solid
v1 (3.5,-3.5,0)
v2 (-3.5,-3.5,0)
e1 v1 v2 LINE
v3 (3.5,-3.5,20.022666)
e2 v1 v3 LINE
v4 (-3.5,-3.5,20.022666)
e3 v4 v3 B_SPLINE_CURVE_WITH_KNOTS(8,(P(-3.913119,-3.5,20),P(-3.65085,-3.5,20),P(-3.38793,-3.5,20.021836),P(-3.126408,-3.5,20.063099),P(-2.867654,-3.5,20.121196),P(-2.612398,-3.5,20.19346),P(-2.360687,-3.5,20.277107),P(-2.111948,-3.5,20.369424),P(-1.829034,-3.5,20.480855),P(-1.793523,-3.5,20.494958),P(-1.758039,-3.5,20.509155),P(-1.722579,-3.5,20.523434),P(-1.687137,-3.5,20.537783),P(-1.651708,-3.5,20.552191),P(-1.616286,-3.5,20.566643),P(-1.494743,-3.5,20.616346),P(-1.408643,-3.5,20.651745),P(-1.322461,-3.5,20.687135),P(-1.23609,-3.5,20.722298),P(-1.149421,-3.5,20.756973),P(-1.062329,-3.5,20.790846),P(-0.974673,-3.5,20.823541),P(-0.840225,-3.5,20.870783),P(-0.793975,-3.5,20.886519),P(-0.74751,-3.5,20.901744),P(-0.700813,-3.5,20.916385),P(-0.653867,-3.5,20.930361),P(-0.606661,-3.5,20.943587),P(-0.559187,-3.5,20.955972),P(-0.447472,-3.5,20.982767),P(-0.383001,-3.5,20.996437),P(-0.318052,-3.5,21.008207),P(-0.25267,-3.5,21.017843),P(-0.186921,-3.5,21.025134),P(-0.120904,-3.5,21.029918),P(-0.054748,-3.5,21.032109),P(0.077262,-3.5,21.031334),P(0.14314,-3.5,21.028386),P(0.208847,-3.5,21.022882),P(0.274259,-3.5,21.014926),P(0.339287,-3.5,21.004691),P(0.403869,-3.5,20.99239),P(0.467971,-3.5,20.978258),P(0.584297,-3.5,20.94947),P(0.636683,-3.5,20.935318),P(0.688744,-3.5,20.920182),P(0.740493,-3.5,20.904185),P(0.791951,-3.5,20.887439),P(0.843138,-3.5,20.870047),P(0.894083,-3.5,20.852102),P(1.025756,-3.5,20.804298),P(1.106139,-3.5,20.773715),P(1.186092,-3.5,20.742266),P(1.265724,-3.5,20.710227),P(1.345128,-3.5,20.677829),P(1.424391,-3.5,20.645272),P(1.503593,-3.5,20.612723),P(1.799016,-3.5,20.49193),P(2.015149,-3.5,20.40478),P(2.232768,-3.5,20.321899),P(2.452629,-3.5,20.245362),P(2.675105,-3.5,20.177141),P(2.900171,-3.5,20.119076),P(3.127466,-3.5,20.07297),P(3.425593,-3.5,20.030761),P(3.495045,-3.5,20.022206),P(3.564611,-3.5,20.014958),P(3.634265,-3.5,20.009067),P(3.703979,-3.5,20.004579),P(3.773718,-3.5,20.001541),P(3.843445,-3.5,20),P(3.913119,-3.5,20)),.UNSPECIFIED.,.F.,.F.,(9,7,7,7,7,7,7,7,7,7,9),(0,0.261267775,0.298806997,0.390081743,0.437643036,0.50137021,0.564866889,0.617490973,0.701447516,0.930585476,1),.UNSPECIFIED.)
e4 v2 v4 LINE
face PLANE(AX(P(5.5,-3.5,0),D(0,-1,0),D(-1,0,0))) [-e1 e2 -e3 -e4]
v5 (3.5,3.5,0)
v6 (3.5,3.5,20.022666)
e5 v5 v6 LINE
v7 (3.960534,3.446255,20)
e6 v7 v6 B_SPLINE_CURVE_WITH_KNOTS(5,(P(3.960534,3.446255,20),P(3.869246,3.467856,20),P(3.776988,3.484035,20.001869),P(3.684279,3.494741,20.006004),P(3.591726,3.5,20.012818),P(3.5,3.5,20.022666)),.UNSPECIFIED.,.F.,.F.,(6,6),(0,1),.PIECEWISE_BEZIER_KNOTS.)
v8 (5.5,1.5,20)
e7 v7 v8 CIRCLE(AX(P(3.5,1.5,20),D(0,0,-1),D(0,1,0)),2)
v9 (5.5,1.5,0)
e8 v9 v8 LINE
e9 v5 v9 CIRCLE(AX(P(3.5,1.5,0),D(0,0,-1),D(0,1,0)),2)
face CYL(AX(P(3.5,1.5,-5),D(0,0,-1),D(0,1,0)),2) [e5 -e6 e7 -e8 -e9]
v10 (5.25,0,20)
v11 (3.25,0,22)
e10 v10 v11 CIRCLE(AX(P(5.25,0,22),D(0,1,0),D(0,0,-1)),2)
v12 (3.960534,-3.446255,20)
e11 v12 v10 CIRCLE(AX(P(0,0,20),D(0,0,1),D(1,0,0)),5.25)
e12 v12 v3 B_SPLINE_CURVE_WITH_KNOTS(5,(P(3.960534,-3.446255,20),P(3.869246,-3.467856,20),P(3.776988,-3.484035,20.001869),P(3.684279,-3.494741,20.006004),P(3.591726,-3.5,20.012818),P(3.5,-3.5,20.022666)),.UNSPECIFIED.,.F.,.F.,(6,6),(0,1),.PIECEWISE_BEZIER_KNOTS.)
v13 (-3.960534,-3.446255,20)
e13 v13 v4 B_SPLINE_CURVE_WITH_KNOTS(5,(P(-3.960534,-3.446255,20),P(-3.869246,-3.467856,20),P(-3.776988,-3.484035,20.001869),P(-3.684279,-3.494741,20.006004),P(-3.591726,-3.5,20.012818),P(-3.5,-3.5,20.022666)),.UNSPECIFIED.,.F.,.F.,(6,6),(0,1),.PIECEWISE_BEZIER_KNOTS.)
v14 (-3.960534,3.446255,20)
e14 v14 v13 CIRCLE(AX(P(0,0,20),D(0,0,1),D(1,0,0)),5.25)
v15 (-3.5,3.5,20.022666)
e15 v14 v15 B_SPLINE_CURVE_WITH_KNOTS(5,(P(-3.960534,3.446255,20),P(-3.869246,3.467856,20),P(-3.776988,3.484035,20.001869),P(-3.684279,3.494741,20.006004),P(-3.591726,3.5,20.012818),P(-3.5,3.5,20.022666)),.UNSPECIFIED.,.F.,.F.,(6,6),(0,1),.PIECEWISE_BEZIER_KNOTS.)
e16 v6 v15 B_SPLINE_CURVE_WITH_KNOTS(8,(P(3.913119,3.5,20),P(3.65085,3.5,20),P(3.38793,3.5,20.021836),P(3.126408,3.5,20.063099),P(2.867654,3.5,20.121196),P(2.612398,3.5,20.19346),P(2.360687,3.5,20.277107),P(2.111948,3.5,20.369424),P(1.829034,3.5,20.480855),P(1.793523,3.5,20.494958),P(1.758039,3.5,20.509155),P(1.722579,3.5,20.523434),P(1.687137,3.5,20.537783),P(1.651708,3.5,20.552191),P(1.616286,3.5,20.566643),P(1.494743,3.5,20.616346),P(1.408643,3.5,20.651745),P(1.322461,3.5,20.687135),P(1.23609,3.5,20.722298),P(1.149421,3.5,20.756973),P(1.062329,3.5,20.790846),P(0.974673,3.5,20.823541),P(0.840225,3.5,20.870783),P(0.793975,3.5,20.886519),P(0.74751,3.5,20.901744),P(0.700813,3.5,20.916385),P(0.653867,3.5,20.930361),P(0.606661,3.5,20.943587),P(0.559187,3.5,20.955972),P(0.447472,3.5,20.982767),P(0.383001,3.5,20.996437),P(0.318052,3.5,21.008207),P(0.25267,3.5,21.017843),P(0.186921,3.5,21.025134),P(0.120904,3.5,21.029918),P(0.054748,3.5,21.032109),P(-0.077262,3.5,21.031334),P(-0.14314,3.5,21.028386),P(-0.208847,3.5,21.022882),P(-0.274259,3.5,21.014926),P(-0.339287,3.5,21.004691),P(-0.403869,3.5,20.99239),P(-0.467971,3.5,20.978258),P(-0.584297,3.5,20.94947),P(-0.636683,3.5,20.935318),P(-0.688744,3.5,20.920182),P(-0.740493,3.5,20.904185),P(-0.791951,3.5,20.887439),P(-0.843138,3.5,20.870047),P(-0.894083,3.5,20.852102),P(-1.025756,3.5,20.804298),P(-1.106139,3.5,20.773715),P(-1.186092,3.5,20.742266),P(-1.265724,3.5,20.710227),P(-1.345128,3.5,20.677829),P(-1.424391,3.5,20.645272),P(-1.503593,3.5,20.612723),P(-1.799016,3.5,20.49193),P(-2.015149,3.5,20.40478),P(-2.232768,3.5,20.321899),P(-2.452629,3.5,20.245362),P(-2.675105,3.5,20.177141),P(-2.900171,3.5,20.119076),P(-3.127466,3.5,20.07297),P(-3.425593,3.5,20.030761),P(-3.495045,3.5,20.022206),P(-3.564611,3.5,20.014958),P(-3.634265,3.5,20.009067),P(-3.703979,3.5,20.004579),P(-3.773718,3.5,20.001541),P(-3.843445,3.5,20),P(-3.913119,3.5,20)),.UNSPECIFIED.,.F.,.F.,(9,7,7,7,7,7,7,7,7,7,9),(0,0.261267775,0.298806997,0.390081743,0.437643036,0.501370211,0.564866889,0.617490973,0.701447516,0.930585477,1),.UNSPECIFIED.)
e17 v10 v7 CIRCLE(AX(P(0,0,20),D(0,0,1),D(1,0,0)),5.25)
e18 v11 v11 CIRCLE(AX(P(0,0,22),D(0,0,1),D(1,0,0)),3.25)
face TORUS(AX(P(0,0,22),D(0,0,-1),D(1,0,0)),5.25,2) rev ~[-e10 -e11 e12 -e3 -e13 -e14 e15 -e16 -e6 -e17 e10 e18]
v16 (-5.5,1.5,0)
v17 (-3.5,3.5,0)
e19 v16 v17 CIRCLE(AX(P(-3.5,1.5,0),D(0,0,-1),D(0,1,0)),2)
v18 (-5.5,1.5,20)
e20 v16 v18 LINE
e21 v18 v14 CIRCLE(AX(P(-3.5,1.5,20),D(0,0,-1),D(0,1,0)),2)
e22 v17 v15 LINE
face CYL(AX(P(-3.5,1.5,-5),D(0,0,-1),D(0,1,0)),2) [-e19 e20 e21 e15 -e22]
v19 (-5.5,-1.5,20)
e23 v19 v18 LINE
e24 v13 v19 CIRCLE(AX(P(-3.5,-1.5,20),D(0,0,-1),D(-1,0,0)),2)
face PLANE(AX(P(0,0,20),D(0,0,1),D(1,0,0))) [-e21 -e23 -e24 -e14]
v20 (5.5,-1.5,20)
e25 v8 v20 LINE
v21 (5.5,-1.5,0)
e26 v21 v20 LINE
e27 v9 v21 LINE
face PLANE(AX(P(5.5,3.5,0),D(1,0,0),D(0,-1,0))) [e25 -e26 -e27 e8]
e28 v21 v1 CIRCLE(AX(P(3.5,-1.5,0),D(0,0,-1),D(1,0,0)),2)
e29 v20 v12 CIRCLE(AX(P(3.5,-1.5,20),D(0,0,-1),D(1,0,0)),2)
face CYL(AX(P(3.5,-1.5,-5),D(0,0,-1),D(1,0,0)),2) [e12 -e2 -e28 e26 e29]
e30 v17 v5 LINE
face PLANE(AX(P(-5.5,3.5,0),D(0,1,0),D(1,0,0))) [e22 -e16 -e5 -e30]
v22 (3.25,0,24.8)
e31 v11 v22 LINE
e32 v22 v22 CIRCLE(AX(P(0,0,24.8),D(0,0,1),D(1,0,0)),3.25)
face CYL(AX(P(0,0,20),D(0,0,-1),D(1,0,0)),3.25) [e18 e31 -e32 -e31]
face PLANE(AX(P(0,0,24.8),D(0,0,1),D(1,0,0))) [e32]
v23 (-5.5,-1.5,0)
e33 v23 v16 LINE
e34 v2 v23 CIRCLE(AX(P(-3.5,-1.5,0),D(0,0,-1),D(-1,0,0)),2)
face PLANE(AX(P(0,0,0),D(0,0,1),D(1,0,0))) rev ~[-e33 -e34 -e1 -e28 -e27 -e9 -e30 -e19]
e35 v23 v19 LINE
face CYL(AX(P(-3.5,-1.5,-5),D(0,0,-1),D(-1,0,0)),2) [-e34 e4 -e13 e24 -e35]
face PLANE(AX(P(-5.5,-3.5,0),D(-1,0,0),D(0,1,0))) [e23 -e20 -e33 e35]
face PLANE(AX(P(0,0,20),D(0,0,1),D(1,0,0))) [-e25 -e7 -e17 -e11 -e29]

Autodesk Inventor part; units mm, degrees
ref_plane "YZ Plane" through (0, 0, 0) normal (1, 0, 0) x (0, 1, 0)
ref_plane "XZ Plane" through (0, 0, 0) normal (0, 1, 0) x (-1, 0, 0)
ref_plane "XY Plane" through (0, 0, 0) normal (0, 0, 1) x (1, 0, 0)
sketch "Sketch1" plane through (0, 0, 0) normal (0, 0, 1) x (1, 0, 0)
  line L0 (-5.5, 3.5) -> (5.5, 3.5)
  line L1 (5.5, 3.5) -> (5.5, -3.5)
  line L2 (5.5, -3.5) -> (-5.5, -3.5)
  line L3 (-5.5, -3.5) -> (-5.5, 3.5)
  line L4 (-5.5, 3.5) -> (5.5, -3.5) construction
  line L5 (5.5, 3.5) -> (-5.5, -3.5) construction
  point P0 (0, 0)
  dimension "d0" = 11
  dimension "d1" = 7
extrude "Extrusion1" add sketch "Sketch1" along normal blind 20
sketch "Sketch2" plane through (0, 0, 20) normal (0, 0, 1) x (1, 0, 0)
  circle A0 centre (0, 0) radius 3.25
  dimension "d4" = 6.5
extrude "Extrusion2" add sketch "Sketch2" along normal blind 4.8
fillet "Fillet1" radius 2 5 edges at (5.5, 3.5, 10) (5.5, -3.5, 10) (-5.5, 3.5, 10) (-5.5, -3.5, 10) (-3.25, 0, 20)
properties part number "Cable_Usb_C"
